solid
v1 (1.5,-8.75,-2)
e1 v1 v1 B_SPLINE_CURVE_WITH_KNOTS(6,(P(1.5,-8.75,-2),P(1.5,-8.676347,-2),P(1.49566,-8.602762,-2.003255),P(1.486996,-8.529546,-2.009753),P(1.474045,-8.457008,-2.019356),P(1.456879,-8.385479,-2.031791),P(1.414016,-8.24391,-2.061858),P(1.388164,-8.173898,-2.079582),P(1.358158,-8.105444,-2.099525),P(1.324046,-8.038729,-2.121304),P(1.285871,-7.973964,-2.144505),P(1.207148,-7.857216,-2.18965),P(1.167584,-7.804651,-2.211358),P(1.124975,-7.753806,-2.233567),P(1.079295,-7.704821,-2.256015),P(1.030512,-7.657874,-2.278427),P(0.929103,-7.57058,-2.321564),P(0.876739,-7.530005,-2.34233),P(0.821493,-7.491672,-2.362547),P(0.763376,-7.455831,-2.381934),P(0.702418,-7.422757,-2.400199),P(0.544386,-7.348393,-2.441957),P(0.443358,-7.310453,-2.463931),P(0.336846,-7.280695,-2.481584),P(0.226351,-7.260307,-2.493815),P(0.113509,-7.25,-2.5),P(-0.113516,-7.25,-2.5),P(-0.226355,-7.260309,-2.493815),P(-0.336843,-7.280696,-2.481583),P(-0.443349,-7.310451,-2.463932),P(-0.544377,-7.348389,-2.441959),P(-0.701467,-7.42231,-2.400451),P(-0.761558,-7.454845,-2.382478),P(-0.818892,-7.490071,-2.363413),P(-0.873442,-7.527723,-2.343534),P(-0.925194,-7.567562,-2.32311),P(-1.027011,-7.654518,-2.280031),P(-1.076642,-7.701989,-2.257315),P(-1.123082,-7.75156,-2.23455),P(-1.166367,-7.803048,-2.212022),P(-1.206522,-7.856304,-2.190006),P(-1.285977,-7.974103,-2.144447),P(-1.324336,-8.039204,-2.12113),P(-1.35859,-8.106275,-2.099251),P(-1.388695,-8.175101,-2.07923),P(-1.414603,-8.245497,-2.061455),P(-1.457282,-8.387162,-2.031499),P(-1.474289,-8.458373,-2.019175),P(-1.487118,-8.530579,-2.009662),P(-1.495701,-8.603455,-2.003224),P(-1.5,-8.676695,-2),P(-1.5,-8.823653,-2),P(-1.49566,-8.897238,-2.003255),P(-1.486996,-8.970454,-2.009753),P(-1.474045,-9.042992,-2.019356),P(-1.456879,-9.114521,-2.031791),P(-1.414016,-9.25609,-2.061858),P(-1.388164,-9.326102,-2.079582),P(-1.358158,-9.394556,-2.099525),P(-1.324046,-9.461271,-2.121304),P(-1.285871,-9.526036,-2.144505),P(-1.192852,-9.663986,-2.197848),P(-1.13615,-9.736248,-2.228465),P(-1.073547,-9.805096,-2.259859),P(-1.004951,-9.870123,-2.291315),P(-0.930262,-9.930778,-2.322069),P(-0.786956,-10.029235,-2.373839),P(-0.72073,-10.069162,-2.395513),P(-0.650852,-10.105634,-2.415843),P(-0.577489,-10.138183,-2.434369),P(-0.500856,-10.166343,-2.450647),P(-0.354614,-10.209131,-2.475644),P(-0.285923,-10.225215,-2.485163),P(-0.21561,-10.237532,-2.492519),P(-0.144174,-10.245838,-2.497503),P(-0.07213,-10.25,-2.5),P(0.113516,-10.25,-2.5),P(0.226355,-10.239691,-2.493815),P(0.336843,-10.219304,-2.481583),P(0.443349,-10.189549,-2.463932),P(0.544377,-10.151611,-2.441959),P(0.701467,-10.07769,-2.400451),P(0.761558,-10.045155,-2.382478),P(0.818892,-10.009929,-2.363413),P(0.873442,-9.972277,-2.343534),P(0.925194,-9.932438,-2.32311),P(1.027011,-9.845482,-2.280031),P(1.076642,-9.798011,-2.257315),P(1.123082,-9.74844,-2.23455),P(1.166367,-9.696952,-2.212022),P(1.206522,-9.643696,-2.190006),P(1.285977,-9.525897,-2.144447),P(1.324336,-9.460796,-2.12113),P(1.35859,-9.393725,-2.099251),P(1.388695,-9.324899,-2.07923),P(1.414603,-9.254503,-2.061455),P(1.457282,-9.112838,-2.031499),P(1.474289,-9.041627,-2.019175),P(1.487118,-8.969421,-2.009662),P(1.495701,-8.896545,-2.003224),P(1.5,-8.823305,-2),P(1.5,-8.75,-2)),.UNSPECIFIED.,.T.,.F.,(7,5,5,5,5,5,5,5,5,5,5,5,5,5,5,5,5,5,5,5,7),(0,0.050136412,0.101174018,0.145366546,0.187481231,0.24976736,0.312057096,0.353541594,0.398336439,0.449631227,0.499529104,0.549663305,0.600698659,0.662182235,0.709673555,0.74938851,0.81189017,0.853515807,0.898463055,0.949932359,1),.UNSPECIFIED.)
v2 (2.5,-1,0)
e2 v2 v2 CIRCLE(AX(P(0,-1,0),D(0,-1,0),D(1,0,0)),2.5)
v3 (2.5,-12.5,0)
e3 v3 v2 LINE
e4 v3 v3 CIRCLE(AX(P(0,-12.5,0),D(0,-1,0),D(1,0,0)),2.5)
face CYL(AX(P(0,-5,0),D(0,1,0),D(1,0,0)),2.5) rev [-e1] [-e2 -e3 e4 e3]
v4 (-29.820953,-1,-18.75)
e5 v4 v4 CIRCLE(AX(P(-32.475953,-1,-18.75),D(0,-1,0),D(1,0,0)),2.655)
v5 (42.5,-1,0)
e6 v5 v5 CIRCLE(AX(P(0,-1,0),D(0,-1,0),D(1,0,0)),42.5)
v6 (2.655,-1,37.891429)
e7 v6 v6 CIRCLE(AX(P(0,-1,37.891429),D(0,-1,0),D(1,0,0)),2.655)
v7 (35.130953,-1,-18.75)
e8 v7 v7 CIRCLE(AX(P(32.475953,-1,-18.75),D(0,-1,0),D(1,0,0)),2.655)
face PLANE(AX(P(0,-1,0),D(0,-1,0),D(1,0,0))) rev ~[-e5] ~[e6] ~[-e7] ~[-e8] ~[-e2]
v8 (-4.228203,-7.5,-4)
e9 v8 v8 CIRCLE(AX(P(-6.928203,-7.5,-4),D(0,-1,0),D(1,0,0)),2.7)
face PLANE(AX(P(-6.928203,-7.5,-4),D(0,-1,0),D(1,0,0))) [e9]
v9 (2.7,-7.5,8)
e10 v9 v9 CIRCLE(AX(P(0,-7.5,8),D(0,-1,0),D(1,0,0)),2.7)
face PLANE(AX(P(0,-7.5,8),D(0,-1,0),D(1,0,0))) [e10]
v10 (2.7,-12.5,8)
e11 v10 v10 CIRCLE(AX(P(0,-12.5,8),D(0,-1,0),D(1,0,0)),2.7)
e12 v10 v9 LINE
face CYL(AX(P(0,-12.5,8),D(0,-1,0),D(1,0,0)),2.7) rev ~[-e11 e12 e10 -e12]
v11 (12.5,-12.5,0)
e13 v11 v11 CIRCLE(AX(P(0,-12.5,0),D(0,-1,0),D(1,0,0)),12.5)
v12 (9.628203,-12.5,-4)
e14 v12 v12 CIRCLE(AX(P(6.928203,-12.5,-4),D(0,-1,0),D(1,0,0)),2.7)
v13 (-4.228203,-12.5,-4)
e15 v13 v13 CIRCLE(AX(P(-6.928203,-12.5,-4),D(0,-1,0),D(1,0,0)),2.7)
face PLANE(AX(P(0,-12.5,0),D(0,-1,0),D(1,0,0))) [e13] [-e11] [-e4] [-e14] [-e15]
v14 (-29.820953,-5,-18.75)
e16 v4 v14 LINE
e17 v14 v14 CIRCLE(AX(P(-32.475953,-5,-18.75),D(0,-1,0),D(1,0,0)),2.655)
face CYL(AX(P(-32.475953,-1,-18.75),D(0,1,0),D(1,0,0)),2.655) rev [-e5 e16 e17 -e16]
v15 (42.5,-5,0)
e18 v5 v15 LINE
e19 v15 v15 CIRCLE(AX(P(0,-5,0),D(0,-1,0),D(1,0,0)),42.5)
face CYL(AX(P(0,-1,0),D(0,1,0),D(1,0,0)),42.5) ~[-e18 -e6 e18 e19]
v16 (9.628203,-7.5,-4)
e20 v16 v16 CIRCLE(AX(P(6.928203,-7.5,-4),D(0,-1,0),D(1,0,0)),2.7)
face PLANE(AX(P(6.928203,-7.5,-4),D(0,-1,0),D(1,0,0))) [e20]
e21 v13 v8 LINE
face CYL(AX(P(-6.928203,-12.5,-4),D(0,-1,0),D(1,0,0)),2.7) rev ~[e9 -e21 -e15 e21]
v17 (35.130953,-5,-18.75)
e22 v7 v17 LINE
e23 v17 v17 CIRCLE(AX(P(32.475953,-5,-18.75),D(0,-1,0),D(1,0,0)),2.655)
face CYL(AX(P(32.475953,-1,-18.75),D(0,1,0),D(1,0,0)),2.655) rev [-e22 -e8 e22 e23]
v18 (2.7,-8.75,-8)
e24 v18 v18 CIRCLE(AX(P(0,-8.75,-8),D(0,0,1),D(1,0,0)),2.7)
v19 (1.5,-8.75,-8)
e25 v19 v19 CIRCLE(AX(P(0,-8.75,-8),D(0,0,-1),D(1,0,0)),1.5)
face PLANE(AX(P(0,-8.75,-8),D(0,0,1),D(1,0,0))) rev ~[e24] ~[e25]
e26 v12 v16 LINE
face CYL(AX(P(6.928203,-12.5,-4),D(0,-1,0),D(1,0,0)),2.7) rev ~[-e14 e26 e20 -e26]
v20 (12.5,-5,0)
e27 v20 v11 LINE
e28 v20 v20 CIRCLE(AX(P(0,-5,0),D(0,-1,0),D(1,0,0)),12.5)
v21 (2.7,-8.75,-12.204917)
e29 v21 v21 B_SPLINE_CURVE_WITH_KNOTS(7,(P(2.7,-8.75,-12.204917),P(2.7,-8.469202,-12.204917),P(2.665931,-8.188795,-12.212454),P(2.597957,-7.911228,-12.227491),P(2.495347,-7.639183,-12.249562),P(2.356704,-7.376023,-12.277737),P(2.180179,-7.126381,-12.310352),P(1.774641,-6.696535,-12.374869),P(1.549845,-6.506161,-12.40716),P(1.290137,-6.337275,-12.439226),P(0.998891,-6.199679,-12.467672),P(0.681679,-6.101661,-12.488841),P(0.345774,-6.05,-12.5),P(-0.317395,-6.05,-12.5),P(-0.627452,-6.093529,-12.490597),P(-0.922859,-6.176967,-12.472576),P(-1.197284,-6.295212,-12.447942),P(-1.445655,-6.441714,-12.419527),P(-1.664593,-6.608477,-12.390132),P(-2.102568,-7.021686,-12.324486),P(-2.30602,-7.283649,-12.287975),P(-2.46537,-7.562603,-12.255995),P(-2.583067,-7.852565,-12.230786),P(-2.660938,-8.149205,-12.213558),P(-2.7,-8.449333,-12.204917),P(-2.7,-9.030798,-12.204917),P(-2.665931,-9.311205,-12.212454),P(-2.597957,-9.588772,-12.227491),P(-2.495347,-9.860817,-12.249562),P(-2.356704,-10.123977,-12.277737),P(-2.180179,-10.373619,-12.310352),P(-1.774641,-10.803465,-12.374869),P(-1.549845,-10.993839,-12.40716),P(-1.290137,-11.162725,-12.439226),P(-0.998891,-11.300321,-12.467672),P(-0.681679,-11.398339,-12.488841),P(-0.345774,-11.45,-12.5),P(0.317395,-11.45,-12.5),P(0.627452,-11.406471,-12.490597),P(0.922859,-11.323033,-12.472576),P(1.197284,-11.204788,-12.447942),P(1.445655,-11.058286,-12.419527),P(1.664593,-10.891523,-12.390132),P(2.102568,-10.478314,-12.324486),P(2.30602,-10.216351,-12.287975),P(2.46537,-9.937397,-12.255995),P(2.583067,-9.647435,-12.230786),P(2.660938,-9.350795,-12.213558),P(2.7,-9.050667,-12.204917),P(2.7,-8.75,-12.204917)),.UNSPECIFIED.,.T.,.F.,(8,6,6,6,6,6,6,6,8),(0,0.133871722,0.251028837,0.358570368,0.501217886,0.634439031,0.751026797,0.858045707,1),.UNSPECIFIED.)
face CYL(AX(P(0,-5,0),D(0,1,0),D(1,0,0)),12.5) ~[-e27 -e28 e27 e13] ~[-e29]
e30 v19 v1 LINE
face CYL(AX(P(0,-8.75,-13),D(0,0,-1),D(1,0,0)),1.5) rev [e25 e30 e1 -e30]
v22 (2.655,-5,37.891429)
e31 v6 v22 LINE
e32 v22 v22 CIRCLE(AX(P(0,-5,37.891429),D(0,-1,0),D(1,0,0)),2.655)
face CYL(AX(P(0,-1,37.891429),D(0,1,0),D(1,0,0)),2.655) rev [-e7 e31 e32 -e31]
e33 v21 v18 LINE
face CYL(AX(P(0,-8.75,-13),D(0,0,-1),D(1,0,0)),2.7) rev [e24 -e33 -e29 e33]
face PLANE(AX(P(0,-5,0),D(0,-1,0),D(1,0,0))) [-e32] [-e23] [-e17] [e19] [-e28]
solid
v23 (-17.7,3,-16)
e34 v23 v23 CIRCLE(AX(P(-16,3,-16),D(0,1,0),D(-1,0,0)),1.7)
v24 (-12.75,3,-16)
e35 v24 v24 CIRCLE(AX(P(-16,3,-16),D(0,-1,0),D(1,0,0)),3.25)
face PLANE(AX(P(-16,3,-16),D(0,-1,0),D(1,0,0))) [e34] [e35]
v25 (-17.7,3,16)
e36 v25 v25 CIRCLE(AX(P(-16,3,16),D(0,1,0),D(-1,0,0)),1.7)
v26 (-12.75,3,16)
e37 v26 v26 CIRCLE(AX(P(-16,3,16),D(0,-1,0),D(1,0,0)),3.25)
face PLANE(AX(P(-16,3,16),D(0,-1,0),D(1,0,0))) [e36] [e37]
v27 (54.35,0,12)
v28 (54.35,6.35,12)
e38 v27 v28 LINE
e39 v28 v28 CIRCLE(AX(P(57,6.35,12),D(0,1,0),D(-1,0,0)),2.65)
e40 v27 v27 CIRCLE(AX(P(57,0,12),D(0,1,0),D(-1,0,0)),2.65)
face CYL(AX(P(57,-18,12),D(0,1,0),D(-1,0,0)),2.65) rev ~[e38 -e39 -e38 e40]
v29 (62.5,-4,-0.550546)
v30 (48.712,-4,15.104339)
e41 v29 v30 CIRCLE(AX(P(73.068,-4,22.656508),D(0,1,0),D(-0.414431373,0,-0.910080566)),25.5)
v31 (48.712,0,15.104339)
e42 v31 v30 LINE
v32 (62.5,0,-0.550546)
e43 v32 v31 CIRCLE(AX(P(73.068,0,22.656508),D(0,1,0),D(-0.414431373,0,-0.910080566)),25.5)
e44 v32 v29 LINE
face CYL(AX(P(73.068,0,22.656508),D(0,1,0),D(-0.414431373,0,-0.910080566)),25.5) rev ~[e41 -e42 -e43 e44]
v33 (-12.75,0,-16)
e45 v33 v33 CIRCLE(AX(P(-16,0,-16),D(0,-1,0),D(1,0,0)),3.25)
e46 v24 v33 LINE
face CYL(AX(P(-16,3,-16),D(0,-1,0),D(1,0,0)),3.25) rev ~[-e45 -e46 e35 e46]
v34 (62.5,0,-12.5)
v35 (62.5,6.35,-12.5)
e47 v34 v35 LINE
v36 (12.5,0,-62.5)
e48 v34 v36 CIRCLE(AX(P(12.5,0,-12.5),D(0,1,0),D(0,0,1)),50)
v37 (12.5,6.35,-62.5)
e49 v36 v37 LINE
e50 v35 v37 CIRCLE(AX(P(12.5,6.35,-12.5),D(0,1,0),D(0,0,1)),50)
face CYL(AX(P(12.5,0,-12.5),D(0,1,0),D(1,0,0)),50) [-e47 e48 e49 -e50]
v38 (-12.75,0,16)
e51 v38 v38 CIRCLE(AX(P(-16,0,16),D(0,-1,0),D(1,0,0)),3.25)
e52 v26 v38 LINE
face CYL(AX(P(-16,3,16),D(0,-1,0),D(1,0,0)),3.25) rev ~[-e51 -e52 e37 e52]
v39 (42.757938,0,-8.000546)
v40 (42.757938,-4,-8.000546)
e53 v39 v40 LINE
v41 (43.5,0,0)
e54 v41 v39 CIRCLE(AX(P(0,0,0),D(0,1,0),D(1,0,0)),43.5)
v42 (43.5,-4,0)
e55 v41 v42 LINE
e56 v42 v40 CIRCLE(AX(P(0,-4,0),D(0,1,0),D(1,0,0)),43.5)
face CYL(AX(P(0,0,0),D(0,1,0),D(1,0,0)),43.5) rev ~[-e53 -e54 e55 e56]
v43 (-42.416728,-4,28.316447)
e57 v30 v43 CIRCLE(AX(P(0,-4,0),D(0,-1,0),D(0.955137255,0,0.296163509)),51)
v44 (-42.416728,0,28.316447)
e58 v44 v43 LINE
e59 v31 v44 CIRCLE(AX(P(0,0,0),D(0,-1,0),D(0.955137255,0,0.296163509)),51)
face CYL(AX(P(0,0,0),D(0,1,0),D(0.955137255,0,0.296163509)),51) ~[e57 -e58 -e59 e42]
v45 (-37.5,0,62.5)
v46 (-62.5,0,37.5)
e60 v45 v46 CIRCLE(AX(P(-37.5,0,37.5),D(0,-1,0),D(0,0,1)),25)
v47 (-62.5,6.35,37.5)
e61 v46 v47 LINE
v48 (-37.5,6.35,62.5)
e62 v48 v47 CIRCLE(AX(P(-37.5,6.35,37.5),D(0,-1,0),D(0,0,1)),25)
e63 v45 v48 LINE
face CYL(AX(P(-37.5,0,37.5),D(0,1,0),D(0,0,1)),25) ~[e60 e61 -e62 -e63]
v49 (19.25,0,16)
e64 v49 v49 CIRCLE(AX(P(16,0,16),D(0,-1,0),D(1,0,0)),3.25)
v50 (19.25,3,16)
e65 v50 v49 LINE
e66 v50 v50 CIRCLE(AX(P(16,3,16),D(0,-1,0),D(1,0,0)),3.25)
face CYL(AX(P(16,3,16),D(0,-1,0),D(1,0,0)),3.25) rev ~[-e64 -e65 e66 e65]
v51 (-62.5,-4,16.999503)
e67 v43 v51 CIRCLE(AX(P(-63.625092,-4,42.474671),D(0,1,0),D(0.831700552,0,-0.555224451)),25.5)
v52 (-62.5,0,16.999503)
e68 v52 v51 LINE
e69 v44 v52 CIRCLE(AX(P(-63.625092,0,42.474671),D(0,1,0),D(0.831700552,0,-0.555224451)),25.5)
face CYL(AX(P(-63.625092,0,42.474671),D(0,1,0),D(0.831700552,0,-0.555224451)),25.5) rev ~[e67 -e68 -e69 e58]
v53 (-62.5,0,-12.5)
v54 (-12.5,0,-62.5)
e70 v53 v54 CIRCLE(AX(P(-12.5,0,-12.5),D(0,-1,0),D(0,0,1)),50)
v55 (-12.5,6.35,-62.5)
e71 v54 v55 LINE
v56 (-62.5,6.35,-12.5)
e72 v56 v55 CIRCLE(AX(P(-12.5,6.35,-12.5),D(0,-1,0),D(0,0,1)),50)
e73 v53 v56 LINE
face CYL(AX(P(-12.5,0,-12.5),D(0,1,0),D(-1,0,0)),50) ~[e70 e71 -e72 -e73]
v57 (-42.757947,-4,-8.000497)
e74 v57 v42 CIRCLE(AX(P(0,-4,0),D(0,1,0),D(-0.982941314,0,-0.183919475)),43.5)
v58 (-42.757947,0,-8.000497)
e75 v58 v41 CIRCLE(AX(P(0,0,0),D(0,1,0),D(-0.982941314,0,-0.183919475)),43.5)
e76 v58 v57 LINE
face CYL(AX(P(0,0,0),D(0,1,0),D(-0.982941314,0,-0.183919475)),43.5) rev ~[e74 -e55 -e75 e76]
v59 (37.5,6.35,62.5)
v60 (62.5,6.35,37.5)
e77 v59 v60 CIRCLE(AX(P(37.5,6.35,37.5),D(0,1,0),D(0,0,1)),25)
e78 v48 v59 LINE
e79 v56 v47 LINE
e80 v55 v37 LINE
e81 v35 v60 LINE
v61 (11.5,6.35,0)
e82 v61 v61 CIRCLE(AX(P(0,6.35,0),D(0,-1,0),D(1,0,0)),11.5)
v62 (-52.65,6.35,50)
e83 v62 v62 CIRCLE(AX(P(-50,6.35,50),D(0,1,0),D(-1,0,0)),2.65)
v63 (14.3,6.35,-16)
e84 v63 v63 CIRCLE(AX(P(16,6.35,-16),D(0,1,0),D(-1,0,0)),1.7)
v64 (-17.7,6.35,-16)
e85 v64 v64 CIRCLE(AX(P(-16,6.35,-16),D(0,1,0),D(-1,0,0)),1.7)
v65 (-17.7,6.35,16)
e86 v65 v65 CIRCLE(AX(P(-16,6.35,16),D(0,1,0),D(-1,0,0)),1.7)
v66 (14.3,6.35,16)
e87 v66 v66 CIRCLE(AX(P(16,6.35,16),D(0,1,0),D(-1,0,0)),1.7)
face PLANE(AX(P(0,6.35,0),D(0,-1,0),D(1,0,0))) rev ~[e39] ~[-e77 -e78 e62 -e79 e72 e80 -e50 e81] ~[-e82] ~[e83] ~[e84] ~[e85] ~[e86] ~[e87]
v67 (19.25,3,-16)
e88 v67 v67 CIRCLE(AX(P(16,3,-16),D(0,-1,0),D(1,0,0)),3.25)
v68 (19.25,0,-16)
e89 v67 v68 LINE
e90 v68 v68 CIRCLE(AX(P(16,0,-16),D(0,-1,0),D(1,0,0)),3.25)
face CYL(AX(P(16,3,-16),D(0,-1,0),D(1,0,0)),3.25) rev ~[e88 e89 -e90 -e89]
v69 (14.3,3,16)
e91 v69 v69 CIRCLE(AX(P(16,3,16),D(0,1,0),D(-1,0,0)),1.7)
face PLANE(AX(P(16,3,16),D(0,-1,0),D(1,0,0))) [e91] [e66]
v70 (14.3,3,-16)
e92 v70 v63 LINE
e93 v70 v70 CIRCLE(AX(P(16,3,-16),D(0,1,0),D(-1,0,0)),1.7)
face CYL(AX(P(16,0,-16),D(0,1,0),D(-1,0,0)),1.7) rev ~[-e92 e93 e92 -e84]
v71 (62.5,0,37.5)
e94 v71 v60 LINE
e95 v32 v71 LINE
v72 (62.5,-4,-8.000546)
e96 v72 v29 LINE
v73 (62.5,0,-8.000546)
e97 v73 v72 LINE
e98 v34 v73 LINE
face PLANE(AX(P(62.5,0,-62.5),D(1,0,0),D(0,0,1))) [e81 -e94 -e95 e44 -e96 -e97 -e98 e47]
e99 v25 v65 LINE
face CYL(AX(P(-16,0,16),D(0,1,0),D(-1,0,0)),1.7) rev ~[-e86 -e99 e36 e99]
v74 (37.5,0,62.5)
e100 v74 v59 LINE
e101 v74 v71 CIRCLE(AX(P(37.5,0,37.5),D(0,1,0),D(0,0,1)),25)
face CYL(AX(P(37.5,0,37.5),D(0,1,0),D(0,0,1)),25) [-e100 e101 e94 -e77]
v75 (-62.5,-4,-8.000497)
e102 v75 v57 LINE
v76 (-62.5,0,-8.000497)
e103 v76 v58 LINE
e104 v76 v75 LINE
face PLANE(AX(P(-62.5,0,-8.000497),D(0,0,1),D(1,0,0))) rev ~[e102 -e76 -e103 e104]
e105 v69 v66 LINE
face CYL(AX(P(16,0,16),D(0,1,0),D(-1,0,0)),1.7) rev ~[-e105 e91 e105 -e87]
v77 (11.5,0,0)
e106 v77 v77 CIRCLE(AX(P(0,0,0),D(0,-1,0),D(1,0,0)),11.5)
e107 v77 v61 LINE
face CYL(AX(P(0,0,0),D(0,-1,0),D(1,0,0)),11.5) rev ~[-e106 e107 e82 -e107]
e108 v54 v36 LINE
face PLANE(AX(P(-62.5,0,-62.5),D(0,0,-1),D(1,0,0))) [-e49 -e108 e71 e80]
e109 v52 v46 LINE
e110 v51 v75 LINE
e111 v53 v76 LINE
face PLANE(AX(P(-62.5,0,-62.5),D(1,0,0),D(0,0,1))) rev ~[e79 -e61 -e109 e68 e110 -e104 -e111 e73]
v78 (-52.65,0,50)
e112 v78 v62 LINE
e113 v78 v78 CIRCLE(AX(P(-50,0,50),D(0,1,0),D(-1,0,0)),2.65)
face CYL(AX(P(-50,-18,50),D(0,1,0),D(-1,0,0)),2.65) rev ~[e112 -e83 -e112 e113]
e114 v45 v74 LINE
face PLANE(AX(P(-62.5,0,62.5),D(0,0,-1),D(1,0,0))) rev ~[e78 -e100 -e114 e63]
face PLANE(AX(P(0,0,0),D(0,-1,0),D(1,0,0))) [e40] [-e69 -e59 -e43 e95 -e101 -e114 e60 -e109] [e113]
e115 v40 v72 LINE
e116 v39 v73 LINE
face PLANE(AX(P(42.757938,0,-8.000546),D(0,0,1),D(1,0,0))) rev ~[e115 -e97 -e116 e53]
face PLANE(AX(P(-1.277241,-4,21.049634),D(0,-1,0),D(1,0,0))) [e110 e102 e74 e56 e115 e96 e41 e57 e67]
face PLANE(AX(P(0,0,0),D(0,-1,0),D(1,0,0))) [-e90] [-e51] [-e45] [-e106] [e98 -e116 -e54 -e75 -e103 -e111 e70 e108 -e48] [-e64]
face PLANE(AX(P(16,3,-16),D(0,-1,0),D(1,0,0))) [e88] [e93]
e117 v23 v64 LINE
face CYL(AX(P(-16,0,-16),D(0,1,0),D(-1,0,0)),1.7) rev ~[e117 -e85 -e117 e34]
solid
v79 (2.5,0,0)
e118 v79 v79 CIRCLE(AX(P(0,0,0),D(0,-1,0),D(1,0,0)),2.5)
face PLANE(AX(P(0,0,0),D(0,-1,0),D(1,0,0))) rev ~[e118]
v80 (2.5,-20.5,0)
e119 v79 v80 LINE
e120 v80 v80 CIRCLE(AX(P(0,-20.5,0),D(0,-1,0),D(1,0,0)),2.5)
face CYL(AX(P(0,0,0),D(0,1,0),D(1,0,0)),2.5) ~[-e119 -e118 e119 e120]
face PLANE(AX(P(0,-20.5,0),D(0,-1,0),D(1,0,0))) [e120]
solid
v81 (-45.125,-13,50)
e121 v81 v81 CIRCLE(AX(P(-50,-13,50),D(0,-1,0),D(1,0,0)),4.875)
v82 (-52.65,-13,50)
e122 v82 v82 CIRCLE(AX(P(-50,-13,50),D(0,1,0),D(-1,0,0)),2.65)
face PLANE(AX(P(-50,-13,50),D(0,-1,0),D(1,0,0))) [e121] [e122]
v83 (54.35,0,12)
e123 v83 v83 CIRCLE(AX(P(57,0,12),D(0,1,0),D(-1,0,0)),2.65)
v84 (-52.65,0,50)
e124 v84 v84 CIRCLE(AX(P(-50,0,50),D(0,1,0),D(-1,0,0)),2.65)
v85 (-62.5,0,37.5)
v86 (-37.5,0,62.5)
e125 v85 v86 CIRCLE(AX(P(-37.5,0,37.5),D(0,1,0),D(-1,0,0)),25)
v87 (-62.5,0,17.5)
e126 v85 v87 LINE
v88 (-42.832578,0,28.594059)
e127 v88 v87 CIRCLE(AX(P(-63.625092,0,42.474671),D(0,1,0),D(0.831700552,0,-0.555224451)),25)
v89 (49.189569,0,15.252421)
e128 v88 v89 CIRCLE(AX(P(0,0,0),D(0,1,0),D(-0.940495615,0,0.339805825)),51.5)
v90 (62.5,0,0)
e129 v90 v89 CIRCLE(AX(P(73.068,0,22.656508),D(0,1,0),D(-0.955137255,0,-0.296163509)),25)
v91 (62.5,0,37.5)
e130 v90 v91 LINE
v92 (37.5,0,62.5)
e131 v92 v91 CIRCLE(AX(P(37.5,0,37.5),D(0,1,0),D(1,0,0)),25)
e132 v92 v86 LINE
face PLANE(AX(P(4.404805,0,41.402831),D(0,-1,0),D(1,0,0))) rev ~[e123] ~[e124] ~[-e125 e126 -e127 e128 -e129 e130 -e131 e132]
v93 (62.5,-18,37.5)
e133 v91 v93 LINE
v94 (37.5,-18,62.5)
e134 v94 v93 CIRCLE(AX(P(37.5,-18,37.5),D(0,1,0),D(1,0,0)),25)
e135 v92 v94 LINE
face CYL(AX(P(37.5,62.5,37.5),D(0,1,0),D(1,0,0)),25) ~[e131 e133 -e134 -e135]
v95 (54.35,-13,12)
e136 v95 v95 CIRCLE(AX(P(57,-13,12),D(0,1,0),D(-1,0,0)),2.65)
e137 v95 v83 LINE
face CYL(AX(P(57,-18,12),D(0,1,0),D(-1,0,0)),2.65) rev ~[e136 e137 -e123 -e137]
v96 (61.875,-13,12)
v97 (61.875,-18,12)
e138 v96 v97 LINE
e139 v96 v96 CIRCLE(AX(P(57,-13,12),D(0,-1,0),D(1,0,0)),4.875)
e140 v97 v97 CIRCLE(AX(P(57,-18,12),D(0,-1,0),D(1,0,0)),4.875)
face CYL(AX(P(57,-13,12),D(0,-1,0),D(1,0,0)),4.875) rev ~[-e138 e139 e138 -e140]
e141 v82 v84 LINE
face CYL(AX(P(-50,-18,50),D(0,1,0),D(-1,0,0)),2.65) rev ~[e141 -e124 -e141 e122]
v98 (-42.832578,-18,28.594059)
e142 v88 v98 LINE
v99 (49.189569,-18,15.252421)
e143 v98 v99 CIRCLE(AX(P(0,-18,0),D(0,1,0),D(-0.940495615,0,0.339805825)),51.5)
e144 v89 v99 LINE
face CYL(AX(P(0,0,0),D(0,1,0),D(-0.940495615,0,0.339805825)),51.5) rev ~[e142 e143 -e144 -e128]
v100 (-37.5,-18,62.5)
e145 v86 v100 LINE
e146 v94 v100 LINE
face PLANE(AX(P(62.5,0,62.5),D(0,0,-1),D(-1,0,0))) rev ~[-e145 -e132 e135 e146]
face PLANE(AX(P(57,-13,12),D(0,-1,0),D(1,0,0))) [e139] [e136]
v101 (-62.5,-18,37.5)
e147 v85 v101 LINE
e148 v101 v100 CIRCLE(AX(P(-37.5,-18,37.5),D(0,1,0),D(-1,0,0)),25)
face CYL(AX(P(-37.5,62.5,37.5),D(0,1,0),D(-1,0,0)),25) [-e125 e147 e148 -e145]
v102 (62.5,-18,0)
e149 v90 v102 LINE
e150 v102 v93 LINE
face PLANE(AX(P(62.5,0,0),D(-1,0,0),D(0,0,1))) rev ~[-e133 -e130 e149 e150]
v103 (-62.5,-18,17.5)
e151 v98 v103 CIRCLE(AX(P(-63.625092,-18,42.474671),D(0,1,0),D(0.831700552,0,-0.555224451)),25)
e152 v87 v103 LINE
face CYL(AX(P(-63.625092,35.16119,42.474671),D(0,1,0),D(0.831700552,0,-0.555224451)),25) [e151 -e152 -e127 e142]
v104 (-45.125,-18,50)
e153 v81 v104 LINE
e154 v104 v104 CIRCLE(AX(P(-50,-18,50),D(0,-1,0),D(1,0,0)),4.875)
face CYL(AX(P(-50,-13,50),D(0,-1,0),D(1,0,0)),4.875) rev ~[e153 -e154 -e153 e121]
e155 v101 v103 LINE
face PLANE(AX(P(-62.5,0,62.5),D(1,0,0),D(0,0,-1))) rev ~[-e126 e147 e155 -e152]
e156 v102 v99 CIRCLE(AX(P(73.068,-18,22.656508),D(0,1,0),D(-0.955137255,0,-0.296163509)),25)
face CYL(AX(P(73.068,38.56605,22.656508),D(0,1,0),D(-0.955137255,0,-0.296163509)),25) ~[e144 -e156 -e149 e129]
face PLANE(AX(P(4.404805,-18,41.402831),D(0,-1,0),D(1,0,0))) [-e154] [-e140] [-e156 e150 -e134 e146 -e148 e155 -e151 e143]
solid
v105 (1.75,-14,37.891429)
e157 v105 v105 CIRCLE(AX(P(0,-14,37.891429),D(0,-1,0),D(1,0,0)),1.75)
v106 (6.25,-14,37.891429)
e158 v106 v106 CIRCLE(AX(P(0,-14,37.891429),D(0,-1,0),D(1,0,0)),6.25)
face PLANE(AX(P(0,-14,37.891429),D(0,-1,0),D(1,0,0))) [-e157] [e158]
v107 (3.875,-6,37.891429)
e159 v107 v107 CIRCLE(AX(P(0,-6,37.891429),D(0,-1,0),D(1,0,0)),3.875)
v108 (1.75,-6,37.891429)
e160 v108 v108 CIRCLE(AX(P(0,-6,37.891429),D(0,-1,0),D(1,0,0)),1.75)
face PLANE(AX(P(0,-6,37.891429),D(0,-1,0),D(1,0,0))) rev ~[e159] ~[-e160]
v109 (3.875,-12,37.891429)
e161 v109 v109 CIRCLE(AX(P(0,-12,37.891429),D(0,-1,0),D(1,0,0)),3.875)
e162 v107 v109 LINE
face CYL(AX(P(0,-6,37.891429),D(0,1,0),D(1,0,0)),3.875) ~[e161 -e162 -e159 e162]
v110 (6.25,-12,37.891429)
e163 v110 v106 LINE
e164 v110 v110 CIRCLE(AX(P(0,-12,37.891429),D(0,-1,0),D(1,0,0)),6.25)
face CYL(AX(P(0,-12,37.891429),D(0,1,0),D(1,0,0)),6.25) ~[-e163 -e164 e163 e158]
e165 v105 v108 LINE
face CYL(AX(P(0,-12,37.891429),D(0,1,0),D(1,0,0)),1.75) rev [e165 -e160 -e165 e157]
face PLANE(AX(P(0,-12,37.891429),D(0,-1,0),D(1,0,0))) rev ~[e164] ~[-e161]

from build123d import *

# Parameters (mm, degrees)
F0_W              = 125
F0_H              = 125
F3_DEPTH          = 6.35
F4_D              = 3.4
F4_CBORE_D        = 6.5
F4_CBORE_DEPTH    = 3
F1_R              = 11.5
F5_DEPTH          = 6.351
F6_R              = 2.5
F7_DEPTH          = 20.5
F9_DEPTH          = 18
F11_R             = 42.5
F11_R_2           = 2.655
F11_R_3           = 2.5
F12_DEPTH         = 4
F13_R             = 12.5
F13_R_2           = 2.5
F14_DEPTH         = 7.5
F15_R             = 2.7
F16_DEPTH         = 5
F18_R             = 1.5
F19_DEPTH         = 13
F20_R             = 2.7
F20_R_2           = 1.5
F21_DEPTH         = 5
F23_D             = 5.3
F23_CBORE_D       = 9.75
F23_CBORE_DEPTH   = 5
F23_2_D           = 5.3
F23_2_CBORE_D     = 9.75
F23_2_CBORE_DEPTH = 5
F27_F1_R          = 25
F27_F2_R          = 25
F27_2_T1_DEPTH    = 88.3223792338
F27_2_T3_DEPTH    = 95.1320995715
F27_2_T5_DEPTH    = 143
F30_DEPTH         = 4
F31_R             = 50
F33_R             = 3.875
F33_R_2           = 1.75
F34_DEPTH         = 6
F35_R             = 6.25
F35_R_2           = 1.75
F36_DEPTH         = 2


# Not quite as in the source:
# - a fillet or chamfer that OpenCascade refuses, or shapes differently, is made with other operations: its cross-section is extruded or revolved along the edge and cut away or added


with BuildPart() as f3:
    # F0 (on Front) → F3 (new body)
    with BuildSketch(Plane.XZ):
        Rectangle(F0_W, F0_H)
    extrude(amount=-F3_DEPTH)

    # F4 (through all)
    with Locations(Plane.XZ):
        with Locations((-16, 16), (16, 16), (-16, -16), (16, -16)):
            CounterBoreHole(F4_D / 2, F4_CBORE_D / 2, F4_CBORE_DEPTH)

    # F1 (on Front) → F5 (cut, through all)
    with BuildSketch(Plane.XZ):
        Circle(F1_R)
    extrude(amount=-F5_DEPTH, mode=Mode.SUBTRACT)

    # F23 (through all)
    with Locations(Plane.XZ.offset(18)):
        with Locations((57, 12), (-50, 50)):
            CounterBoreHole(F23_D / 2, F23_CBORE_D / 2, F23_CBORE_DEPTH)

    # F27: fillet of radius 25 on 2 edges, made by hand

    # F27_f1
    f27_f1_edges = [f3.edges().sort_by_distance(p)[0] for p in [
        (62.5, 3.175, 62.5),
    ]]
    fillet(f27_f1_edges, radius=F27_F1_R)

    # F27_f2
    f27_f2_edges = [f3.edges().sort_by_distance(p)[0] for p in [
        (-62.5, 3.175, 62.5),
    ]]
    fillet(f27_f2_edges, radius=F27_F2_R)

    # F29 (on face) → F30 (join)
    with BuildSketch(Plane.XZ):
        with BuildLine():
            ThreePointArc((48.712, 15.1043389792), (7.3176199351, 50.4722937708), (-42.4167281702, 28.3164470111))
            ThreePointArc((-42.4167281702, 28.3164470111), (-51.1065410497, 20.2590031688), (-62.5, 16.9995028545))
            Line((-62.5, 16.9995028545), (-62.5, -8.0004971455))
            Line((-62.5, -8.0004971455), (-42.757947161, -8.0004971455))
            ThreePointArc((-42.757947161, -8.0004971455), (-4.0174182316, 43.3140895178), (43.5, 0))
            ThreePointArc((43.5, 0), (43.3140872238, -4.0174429644), (42.7579380243, -8.0005459758))
            Line((42.7579380243, -8.0005459758), (62.5, -8.0005459758))
            Line((62.5, -8.0005459758), (62.5, -0.5505459758))
            ThreePointArc((62.5, -0.5505459758), (53.9319006133, 5.8024377362), (48.712, 15.1043389792))
        make_face()
    extrude(amount=F30_DEPTH)

    # F31
    f31_edges = [f3.edges().sort_by_distance(p)[0] for p in [
        (-62.5, 3.175, -62.5),
        (62.5, 3.175, -62.5),
    ]]
    fillet(f31_edges, radius=F31_R)


with BuildPart() as f7:
    # F6 (on Front) → F7 (new body)
    with BuildSketch(Plane.XZ):
        Circle(F6_R)
    extrude(amount=F7_DEPTH)


with BuildPart() as f9:
    # F8 (on Front) → F9 (new body)
    with BuildSketch(Plane.XZ):
        with BuildLine():
            ThreePointArc((-48.4355241532, 17.5), (8.8831443225, 50.7280962283), (51.5, 0))
            Line((51.5, 0), (62.5, 0))
            Line((62.5, 0), (62.5, 62.5))
            Line((62.5, 62.5), (-62.5, 62.5))
            Line((-62.5, 62.5), (-62.5, 17.5))
            Line((-62.5, 17.5), (-48.4355241532, 17.5))
        make_face()
    extrude(amount=F9_DEPTH)

    # F23#2 (through all)
    with Locations(Plane.XZ.offset(18)):
        with Locations((57, 12), (-50, 50)):
            CounterBoreHole(F23_2_D / 2, F23_2_CBORE_D / 2, F23_2_CBORE_DEPTH)

    # F27#2: fillet of radius 25 on 4 edges, made by hand

    # F27_2_s2 → F27_2_t1 (cut)
    with BuildSketch(Plane.XZ.offset(-35.1611896169)):
        with BuildLine():
            ThreePointArc((-42.8325784464, 28.5940592367), (-51.3423848386, 20.7000270405), (-62.5, 17.5))
            Line((-62.5, 17.5), (-48.4355241532, 17.5))
            ThreePointArc((-48.4355241532, 17.5), (-45.9699486145, 23.2166712596), (-42.8325784464, 28.5940592367))
        make_face()
    extrude(amount=F27_2_T1_DEPTH, mode=Mode.SUBTRACT)

    # F27_2_s4 → F27_2_t3 (cut)
    with BuildSketch(Plane.XZ.offset(-38.5660497858)):
        with BuildLine():
            ThreePointArc((49.1895686275, 15.2524207339), (54.2319111507, 6.2186936243), (62.5, 0))
            Line((62.5, 0), (51.5, 0))
            ThreePointArc((51.5, 0), (50.9191161761, 7.7132099572), (49.1895686275, 15.2524207339))
        make_face()
    extrude(amount=F27_2_T3_DEPTH, mode=Mode.SUBTRACT)

    # F27_2_s6 → F27_2_t5 (cut)
    with BuildSketch(Plane.XZ.offset(-62.5)):
        with BuildLine():
            ThreePointArc((-62.5, 37.5), (-55.1776695297, 55.1776695297), (-37.5, 62.5))
            Line((-37.5, 62.5), (-62.5, 62.5))
            Line((-62.5, 62.5), (-62.5, 37.5))
        make_face()
        with BuildLine():
            ThreePointArc((62.5, 37.5), (55.1776695297, 55.1776695297), (37.5, 62.5))
            Line((37.5, 62.5), (62.5, 62.5))
            Line((62.5, 62.5), (62.5, 37.5))
        make_face()
    extrude(amount=F27_2_T5_DEPTH, mode=Mode.SUBTRACT)


with BuildPart() as f12:
    # F11 (on offset) → F12 (new body)
    with BuildSketch(Plane.XZ.offset(1)):
        Circle(F11_R)
        with Locations((-32.4759526419, -18.75)):
            Circle(F11_R_2, mode=Mode.SUBTRACT)
        with Locations((32.4759526419, -18.75)):
            Circle(F11_R_2, mode=Mode.SUBTRACT)
        Circle(F11_R_3, mode=Mode.SUBTRACT)
        with Locations((0, 37.8914289176)):
            Circle(F11_R_2, mode=Mode.SUBTRACT)
    extrude(amount=F12_DEPTH)

    # F13 (on face) → F14 (join)
    with BuildSketch(Plane.XZ.offset(5)):
        Circle(F13_R)
        Circle(F13_R_2, mode=Mode.SUBTRACT)
    extrude(amount=F14_DEPTH)

    # F15 (on face) → F16 (cut)
    with BuildSketch(Plane.XZ.offset(12.5)):
        with Locations((0, 8)):
            Circle(F15_R)
        with Locations((6.9282032303, -4)):
            Circle(F15_R)
        with Locations((-6.9282032303, -4)):
            Circle(F15_R)
    extrude(amount=-F16_DEPTH, mode=Mode.SUBTRACT)

    # F18 (on offset) → F19 (cut)
    with BuildSketch(Plane.XY.offset(-13)):
        with Locations((0, -8.75)):
            Circle(F18_R)
    extrude(amount=F19_DEPTH, mode=Mode.SUBTRACT)

    # F20 (on offset) → F21 (cut)
    with BuildSketch(Plane.XY.offset(-13)):
        with Locations((0, -8.75)):
            Circle(F20_R)
        with Locations((0, -8.75)):
            Circle(F20_R_2, mode=Mode.SUBTRACT)
        with Locations((0, -8.75)):
            Circle(F20_R_2)
    extrude(amount=F21_DEPTH, mode=Mode.SUBTRACT)


with BuildPart() as f34:
    # F33 (on offset) → F34 (new body)
    with BuildSketch(Plane.XZ.offset(6)):
        with Locations((0, 37.8914289176)):
            Circle(F33_R)
        with Locations((0, 37.8914289176)):
            Circle(F33_R_2, mode=Mode.SUBTRACT)
    extrude(amount=F34_DEPTH)

    # F35 (on face) → F36 (join)
    with BuildSketch(Plane.XZ.offset(12)):
        with Locations((0, 37.8914289176)):
            Circle(F35_R)
        with Locations((0, 37.8914289176)):
            Circle(F35_R_2, mode=Mode.SUBTRACT)
    extrude(amount=F36_DEPTH)


solid = Compound([f3.part, f7.part, f9.part, f12.part, f34.part])
